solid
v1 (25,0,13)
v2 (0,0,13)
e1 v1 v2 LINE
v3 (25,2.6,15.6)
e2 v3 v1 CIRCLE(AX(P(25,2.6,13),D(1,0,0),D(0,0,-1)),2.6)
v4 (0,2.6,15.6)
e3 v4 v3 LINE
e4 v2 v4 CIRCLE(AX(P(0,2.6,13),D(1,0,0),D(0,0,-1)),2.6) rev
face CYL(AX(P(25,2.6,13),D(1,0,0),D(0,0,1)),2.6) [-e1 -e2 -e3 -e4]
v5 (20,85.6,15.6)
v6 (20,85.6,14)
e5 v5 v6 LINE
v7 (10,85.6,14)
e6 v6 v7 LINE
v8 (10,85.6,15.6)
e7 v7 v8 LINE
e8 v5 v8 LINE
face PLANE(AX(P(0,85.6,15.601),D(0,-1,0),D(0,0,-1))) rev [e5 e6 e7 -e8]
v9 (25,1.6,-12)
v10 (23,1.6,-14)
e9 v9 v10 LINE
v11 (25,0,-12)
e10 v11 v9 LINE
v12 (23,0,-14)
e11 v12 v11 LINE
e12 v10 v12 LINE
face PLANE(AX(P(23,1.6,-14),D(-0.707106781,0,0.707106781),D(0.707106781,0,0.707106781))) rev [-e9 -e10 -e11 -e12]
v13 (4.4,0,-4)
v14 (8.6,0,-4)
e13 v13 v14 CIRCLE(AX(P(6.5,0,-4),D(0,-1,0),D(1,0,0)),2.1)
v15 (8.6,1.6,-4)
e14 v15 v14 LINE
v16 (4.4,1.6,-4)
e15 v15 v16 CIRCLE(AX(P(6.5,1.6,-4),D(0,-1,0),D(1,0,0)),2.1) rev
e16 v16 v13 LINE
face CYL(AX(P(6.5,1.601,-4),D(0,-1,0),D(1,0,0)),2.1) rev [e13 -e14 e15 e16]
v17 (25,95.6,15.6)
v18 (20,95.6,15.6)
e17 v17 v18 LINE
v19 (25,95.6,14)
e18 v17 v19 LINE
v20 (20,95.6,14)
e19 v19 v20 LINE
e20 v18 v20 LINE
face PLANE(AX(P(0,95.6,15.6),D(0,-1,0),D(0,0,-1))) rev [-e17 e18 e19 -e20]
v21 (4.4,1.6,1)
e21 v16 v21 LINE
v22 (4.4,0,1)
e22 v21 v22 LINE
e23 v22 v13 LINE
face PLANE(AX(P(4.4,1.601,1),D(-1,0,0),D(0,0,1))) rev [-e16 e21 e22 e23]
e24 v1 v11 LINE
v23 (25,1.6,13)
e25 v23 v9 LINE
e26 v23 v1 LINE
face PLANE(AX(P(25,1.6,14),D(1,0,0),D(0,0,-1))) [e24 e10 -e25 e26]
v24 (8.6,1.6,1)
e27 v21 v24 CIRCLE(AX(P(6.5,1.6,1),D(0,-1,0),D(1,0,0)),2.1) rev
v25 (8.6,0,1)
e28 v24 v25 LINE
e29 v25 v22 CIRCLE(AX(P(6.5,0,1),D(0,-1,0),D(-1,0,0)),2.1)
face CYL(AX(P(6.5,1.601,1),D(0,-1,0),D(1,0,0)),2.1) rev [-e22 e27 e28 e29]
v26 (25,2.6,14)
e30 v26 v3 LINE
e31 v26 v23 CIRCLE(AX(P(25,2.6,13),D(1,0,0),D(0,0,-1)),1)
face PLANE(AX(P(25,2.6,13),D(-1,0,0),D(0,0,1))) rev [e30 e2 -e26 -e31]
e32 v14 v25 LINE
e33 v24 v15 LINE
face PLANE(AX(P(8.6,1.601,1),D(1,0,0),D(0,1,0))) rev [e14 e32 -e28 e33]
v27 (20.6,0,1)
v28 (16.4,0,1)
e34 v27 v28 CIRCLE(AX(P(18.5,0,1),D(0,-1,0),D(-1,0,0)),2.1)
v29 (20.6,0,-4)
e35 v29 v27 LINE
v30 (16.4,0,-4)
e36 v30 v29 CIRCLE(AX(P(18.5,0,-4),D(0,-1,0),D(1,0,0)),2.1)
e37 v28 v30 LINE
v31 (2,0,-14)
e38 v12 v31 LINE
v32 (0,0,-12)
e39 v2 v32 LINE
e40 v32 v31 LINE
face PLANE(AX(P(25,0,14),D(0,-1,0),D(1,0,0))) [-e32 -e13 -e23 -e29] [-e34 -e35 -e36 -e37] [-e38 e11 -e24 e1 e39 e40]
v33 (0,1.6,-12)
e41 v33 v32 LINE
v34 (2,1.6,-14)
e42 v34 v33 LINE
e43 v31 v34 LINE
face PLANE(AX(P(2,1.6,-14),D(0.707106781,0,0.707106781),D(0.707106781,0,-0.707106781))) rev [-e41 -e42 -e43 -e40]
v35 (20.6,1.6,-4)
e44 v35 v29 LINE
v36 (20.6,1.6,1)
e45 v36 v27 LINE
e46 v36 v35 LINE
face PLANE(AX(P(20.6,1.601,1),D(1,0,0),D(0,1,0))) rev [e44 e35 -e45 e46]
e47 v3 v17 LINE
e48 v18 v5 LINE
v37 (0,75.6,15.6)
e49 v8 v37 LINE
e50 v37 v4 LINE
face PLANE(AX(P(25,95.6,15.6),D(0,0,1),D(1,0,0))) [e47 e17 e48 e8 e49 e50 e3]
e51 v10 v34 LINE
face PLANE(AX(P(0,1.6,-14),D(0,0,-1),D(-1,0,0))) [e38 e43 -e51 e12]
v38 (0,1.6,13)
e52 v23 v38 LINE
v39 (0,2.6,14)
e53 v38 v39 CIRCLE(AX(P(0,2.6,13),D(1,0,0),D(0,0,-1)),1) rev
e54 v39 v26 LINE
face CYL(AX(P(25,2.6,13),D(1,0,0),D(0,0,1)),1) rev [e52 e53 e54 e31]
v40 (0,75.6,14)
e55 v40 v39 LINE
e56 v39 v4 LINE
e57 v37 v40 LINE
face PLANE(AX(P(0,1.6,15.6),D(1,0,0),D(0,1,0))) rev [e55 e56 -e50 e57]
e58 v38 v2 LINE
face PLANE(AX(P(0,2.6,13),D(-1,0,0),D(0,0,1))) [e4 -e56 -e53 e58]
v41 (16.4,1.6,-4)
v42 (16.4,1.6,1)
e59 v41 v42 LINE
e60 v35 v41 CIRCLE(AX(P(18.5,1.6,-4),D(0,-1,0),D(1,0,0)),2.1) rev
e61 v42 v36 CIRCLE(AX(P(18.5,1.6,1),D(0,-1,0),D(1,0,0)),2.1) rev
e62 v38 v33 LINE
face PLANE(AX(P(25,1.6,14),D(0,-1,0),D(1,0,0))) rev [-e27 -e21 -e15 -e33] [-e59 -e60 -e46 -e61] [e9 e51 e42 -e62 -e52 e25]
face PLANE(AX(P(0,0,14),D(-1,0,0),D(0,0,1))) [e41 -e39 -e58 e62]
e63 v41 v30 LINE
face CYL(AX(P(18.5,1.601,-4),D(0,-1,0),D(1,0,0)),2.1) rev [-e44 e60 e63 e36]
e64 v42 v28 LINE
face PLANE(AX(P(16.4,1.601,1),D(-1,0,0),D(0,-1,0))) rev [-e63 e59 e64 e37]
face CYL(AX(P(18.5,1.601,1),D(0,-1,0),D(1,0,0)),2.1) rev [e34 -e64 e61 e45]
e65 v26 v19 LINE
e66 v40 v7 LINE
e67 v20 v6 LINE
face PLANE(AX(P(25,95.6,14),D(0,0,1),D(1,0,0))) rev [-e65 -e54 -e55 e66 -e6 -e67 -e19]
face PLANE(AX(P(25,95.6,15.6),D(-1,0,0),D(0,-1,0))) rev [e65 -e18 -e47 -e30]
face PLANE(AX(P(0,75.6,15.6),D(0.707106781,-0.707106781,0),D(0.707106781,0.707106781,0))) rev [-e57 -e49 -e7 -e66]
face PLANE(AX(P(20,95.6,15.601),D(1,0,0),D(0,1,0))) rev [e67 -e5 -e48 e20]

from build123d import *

# Parameters (mm, degrees)
SKETCH_1_W                       = 25
SKETCH_1_H                       = 1.6
SM_BASE_FLANGE_1_DEPTH           = 14
CUT_EXTRUDE_2_REACH              = 30.698
SM_EDGE_FLANGE_1_STRIP_W         = 8.4
SM_EDGE_FLANGE_1_STRIP_H         = 1.6
SM_EDGE_FLANGE_1_STRIP_CUT_DEPTH = 25
SM_EDGE_FLANGE_1_DEPTH           = 25
CUT_EXTRUDE_1_REACH              = 104.705
SKETCH_10_W                      = 20
SKETCH_10_H                      = 10
CHAMFER_1_SIZE                   = 10
CHAMFER_2_SIZE                   = 2


# Sheet-metal steps are written as plain solids
with BuildPart() as part:
    # Sketch 1 → 基材-凸緣1 (new, symmetric)
    with BuildSketch(Plane.XY):
        with Locations((12.5, 0.8)):
            Rectangle(SKETCH_1_W, SKETCH_1_H)
    extrude(amount=SM_BASE_FLANGE_1_DEPTH, both=True)

    # 草圖11 → 除料-伸長2 (cut, up to next)
    with BuildSketch(Plane.XZ, mode=Mode.PRIVATE) as cut_extrude_2_sk1:
        with BuildLine():
            Line((16.4, 1), (16.4, -4))
            ThreePointArc((16.4, -4), (18.5, -6.1), (20.6, -4))
            Line((20.6, -4), (20.6, 1))
            ThreePointArc((20.6, 1), (18.5, 3.1), (16.4, 1))
        make_face()
    cut_extrude_2_tool1 = extrude(cut_extrude_2_sk1.sketch, amount=-CUT_EXTRUDE_2_REACH, mode=Mode.PRIVATE) & part.part
    # 草圖11 → 除料-伸長2 (cut, up to next)
    with BuildSketch(Plane.XZ, mode=Mode.PRIVATE) as cut_extrude_2_sk2:
        with BuildLine():
            Line((4.4, 1), (4.4, -4))
            ThreePointArc((4.4, -4), (6.5, -6.1), (8.6, -4))
            Line((8.6, -4), (8.6, 1))
            ThreePointArc((8.6, 1), (6.5, 3.1), (4.4, 1))
        make_face()
    cut_extrude_2_tool2 = extrude(cut_extrude_2_sk2.sketch, amount=-CUT_EXTRUDE_2_REACH, mode=Mode.PRIVATE) & part.part
    add(cut_extrude_2_tool1.solids().sort_by_distance((18.5, 0, -1.5))[0], mode=Mode.SUBTRACT)
    add(cut_extrude_2_tool2.solids().sort_by_distance((6.5, 0, -1.5))[0], mode=Mode.SUBTRACT)

    # 邊線-凸緣1 strip (across the edge) → 邊線-凸緣1 strip cut (cut)
    with BuildSketch(Plane(origin=(0, 1.6, 14), x_dir=(0, 0, -1), z_dir=(1, 0, 0))):
        with Locations((-3.2, -0.8)):
            Rectangle(SM_EDGE_FLANGE_1_STRIP_W, SM_EDGE_FLANGE_1_STRIP_H)
    extrude(amount=SM_EDGE_FLANGE_1_STRIP_CUT_DEPTH, mode=Mode.SUBTRACT)

    # 邊線-凸緣1 section (across the edge) → 邊線-凸緣1 (add)
    with BuildSketch(Plane(origin=(0, 1.6, 14), x_dir=(0, 0, -1), z_dir=(1, 0, 0))):
        with BuildLine():
            Line((-1.6, 1), (-1.6, 94))
            Line((-1.6, 94), (0, 94))
            Line((0, 94), (0, 1))
            ThreePointArc((0, 1), (0.292893219, 0.292893219), (1, 0))
            Line((1, 0), (1, -1.6))
            ThreePointArc((1, -1.6), (-0.838477631, -0.838477631), (-1.6, 1))
        make_face()
    extrude(amount=SM_EDGE_FLANGE_1_DEPTH)

    # 草圖10 → 除料-伸長1 (cut, up to next)
    with BuildSketch(Plane(origin=(0, 0, 14), x_dir=(-1, 0, 0), z_dir=(0, 0, -1)), mode=Mode.PRIVATE) as cut_extrude_1_sk1:
        with Locations((-10, 90.6)):
            Rectangle(SKETCH_10_W, SKETCH_10_H)
    cut_extrude_1_tool1 = extrude(cut_extrude_1_sk1.sketch, amount=-CUT_EXTRUDE_1_REACH, mode=Mode.PRIVATE) & part.part
    add(cut_extrude_1_tool1.solids().sort_by_distance((10, 90.6, 14))[0], mode=Mode.SUBTRACT)

    # 導角1
    chamfer_1_edges = [part.edges().sort_by_distance(p)[0] for p in [
        (0, 85.6, 14.8),
    ]]
    chamfer(chamfer_1_edges, length=CHAMFER_1_SIZE)

    # 導角2
    chamfer_2_edges = [part.edges().sort_by_distance(p)[0] for p in [
        (25, 0.8, -14),
        (0, 0.8, -14),
    ]]
    chamfer(chamfer_2_edges, length=CHAMFER_2_SIZE)


solid = part.part
